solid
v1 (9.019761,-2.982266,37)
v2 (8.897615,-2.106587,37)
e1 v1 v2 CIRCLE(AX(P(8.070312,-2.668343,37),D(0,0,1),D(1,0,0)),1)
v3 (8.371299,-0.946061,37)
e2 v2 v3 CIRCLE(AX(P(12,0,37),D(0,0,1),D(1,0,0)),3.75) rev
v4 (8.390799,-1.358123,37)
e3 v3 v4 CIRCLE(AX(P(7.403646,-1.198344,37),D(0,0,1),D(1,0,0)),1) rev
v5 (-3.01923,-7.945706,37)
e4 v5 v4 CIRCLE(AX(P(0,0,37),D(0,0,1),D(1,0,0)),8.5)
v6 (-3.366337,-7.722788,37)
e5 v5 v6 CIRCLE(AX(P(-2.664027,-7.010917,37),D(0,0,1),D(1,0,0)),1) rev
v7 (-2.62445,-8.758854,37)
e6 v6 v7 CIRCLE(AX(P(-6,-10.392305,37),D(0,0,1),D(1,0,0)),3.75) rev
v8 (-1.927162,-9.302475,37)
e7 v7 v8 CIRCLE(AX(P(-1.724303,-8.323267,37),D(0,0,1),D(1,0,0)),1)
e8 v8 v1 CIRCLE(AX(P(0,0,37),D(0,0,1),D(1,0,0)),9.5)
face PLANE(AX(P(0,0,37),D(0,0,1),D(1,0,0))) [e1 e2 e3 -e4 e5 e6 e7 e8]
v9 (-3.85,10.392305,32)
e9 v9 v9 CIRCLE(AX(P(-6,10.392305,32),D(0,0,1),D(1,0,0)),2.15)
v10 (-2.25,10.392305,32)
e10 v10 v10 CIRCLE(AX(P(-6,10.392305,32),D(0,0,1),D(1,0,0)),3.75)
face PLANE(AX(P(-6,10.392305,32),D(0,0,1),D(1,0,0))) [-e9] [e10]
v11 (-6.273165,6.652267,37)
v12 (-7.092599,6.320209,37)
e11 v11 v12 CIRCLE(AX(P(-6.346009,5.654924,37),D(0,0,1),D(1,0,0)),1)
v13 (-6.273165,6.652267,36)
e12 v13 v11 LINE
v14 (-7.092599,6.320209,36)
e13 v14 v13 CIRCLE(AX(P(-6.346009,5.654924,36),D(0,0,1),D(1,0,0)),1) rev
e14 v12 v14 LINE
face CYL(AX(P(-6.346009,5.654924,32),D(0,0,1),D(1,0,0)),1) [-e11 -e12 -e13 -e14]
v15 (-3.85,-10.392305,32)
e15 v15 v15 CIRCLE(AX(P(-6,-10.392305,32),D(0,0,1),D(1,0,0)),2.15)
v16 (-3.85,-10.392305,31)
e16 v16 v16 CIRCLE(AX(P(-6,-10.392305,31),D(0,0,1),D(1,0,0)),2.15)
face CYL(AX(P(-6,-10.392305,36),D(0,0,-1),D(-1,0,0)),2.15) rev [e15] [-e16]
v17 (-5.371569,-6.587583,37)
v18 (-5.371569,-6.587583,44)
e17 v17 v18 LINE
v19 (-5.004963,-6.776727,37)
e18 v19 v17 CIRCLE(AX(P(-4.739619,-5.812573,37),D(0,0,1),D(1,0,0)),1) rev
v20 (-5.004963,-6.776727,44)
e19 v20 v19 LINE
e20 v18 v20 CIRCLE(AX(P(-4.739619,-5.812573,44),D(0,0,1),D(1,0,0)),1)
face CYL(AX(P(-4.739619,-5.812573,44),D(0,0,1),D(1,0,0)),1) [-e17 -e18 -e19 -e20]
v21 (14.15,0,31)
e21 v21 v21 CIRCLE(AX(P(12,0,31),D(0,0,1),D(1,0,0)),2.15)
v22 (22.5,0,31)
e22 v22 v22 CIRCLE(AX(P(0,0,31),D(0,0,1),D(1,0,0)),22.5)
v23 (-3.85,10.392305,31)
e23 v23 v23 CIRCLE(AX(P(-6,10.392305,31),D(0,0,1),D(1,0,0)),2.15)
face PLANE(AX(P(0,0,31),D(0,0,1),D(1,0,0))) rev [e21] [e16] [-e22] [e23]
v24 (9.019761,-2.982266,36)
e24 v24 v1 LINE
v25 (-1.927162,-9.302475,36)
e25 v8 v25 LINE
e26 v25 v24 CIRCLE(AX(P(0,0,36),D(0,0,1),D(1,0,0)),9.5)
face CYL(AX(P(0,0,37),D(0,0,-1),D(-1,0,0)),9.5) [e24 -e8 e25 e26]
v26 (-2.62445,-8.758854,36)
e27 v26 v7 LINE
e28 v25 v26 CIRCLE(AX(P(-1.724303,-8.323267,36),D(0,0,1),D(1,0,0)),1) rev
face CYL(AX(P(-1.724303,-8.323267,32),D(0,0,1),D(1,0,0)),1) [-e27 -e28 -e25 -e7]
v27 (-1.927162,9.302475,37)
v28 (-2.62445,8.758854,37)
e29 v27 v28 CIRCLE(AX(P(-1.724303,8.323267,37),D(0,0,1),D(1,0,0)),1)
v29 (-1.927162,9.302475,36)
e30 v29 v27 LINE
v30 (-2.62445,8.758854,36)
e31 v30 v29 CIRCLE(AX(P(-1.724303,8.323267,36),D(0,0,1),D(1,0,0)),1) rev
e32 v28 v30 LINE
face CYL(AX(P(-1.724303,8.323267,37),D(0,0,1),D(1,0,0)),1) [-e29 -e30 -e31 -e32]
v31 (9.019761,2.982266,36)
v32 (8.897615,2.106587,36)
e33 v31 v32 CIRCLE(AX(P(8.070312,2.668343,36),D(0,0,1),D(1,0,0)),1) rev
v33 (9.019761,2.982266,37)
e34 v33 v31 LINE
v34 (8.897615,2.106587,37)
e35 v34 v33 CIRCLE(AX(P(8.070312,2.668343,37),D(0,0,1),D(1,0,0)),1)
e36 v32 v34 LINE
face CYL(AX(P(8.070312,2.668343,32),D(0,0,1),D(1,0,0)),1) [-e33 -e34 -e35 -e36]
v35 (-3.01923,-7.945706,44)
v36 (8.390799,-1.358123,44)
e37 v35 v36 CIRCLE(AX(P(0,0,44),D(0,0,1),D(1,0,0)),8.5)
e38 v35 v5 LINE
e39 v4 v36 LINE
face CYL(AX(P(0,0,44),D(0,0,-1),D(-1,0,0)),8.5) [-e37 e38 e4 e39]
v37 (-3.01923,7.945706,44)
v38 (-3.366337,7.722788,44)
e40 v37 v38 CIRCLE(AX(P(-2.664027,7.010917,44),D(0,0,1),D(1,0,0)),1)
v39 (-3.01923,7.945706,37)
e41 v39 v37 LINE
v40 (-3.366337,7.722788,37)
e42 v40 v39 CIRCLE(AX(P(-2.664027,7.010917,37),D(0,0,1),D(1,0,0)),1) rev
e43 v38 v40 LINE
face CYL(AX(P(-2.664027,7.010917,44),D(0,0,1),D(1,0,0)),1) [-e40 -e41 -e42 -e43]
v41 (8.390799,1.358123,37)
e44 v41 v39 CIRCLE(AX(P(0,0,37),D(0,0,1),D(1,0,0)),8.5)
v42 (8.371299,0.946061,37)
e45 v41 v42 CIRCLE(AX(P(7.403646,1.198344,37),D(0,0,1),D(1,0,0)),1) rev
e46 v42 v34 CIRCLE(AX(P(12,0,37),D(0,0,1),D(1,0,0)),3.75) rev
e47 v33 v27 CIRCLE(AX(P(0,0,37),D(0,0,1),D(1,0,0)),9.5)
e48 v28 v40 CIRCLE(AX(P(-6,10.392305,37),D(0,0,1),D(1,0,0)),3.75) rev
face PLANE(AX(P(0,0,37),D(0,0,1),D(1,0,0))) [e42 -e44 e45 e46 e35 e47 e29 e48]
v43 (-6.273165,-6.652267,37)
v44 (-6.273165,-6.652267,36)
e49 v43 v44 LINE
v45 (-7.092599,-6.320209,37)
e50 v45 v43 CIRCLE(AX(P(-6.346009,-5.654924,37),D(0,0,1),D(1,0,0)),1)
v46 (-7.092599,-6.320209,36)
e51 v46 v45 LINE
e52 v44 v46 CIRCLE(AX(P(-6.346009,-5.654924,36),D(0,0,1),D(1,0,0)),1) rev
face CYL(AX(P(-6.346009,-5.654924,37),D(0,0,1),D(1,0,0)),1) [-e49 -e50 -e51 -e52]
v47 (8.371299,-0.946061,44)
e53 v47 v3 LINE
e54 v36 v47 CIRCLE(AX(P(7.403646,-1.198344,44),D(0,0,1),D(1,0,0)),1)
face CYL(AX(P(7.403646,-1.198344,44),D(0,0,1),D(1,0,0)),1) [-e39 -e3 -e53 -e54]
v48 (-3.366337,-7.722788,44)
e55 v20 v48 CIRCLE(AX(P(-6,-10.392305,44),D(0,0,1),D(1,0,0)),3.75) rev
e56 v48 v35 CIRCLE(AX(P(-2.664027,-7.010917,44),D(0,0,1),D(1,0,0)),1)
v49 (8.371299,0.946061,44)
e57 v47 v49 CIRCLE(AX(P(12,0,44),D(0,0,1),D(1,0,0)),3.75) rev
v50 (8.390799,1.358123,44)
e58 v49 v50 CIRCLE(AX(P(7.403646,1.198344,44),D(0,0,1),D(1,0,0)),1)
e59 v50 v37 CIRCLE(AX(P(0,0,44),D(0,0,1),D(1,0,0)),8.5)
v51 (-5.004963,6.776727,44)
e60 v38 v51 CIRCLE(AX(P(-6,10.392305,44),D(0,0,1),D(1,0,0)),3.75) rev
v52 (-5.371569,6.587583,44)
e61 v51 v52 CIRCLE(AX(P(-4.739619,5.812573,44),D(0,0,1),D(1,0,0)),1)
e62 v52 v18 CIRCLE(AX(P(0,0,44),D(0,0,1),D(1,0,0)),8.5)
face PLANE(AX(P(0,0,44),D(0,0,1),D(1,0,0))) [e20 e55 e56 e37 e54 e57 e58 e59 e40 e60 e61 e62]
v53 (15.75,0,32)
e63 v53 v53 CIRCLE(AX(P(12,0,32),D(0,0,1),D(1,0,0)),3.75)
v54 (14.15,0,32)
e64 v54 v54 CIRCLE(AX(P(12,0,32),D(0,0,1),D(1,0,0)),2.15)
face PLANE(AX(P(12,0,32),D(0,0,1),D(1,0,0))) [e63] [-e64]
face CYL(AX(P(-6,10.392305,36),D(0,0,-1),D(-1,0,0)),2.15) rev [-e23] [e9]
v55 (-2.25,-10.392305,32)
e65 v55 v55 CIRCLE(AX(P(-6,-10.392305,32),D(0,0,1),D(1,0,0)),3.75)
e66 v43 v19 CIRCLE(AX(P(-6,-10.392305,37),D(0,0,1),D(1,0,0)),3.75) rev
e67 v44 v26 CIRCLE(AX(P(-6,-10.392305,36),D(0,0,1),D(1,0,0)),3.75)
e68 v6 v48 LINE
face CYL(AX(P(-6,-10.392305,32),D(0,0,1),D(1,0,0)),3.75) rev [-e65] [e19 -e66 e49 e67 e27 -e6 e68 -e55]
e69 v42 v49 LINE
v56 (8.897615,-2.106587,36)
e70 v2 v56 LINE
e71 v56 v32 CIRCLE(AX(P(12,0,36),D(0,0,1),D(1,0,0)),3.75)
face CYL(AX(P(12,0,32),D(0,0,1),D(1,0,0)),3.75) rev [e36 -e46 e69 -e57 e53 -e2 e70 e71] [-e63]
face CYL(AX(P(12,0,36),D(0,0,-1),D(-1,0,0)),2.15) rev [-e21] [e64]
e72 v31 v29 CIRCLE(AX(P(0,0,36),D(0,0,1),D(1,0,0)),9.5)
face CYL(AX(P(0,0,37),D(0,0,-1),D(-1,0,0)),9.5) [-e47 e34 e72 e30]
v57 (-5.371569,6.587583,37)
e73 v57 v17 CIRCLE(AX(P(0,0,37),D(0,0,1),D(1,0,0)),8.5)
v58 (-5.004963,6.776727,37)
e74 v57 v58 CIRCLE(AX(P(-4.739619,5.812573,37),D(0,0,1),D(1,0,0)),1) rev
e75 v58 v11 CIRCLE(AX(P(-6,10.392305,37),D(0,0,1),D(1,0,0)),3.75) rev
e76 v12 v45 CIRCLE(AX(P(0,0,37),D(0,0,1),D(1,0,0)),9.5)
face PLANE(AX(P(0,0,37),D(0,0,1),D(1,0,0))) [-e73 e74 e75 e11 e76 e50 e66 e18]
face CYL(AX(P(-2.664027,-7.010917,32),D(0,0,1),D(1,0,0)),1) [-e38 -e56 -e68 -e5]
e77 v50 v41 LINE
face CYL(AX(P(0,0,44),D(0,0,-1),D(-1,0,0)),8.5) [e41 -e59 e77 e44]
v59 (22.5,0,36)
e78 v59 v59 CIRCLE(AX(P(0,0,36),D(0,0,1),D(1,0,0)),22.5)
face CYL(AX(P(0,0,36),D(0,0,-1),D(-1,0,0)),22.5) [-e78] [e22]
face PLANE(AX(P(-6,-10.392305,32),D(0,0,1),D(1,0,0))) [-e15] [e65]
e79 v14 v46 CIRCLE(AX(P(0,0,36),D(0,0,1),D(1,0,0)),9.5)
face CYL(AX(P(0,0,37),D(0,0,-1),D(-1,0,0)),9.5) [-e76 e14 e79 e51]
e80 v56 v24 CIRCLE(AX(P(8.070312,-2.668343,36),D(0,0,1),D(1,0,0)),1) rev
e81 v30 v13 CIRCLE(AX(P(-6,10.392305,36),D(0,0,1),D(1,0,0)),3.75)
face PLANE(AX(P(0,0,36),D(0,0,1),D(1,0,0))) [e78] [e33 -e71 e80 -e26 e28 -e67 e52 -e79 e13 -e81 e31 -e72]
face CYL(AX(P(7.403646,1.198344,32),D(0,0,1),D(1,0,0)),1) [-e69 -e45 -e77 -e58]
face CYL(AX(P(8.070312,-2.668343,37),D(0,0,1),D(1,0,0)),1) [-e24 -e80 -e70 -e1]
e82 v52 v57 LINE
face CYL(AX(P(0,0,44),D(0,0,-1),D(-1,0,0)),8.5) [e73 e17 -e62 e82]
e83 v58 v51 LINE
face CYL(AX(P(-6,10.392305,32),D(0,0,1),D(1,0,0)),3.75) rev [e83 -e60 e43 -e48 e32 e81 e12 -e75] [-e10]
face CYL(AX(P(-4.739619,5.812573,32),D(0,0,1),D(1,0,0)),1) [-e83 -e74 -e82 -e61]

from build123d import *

# Parameters (mm, degrees)
SKETCH1_R           = 22.5
SKETCH1_R_2         = 2.15
BOSS_EXTRUDE1_DEPTH = 5
SKETCH2_R           = 3.75
CUT_EXTRUDE1_DEPTH  = 4
BOSS_EXTRUDE2_DEPTH = 1
BOSS_EXTRUDE3_DEPTH = 7
FILLET1_R           = 1


# Read off the part's stored shape, not the designer's step: Boss-Extrude2
with BuildPart() as part:
    # Sketch1 → Boss-Extrude1 (new body)
    with BuildSketch(Plane.XY.offset(31)):
        Circle(SKETCH1_R)
        with Locations((-6, 10.392304845)):
            Circle(SKETCH1_R_2, mode=Mode.SUBTRACT)
        with Locations((-6, -10.392304845)):
            Circle(SKETCH1_R_2, mode=Mode.SUBTRACT)
        with Locations((12, 0)):
            Circle(SKETCH1_R_2, mode=Mode.SUBTRACT)
    extrude(amount=BOSS_EXTRUDE1_DEPTH)

    # Sketch2 → Cut-Extrude1 (cut)
    with BuildSketch(Plane.XY.offset(36)):
        with Locations((-6, 10.392304845)):
            Circle(SKETCH2_R)
        with Locations((12, 0)):
            Circle(SKETCH2_R)
        with Locations((-6, -10.392304845)):
            Circle(SKETCH2_R)
    extrude(amount=-CUT_EXTRUDE1_DEPTH, mode=Mode.SUBTRACT)

    # Boss-Extrude2 outline → Boss-Extrude2 (add)
    with BuildSketch(Plane.XY.offset(36)):
        with BuildLine():
            ThreePointArc((9.174479167, -2.46554903), (8.25, 0), (9.174479167, 2.46554903))
            ThreePointArc((9.174479167, 2.46554903), (4.75, 8.227241336), (-2.452011489, 9.17810654))
            ThreePointArc((-2.452011489, 9.17810654), (-4.125, 7.144709581), (-6.722467678, 6.712557509))
            ThreePointArc((-6.722467678, 6.712557509), (-9.5, 0), (-6.722467678, -6.71255751))
            ThreePointArc((-6.722467678, -6.71255751), (-4.125, -7.144709581), (-2.452011489, -9.17810654))
            ThreePointArc((-2.452011489, -9.17810654), (4.75, -8.227241336), (9.174479167, -2.46554903))
        make_face()
    extrude(amount=BOSS_EXTRUDE2_DEPTH)

    # Sketch4 → Boss-Extrude3 (add)
    with BuildSketch(Plane.XY.offset(37)):
        with BuildLine():
            ThreePointArc((8.424479167, -1.130553303), (8.25, 0), (8.424479167, 1.130553303))
            ThreePointArc((8.424479167, 1.130553303), (4.25, 7.361215932), (-3.233151703, 7.861089623))
            ThreePointArc((-3.233151703, 7.861089623), (-4.125, 7.144709581), (-5.191327464, 6.730536321))
            ThreePointArc((-5.191327464, 6.730536321), (-8.5, 0), (-5.191327464, -6.730536321))
            ThreePointArc((-5.191327464, -6.730536321), (-4.125, -7.144709581), (-3.233151703, -7.861089623))
            ThreePointArc((-3.233151703, -7.861089623), (4.25, -7.361215932), (8.424479167, -1.130553303))
        make_face()
    extrude(amount=BOSS_EXTRUDE3_DEPTH)

    # Fillet1
    # the kernel refuses this fillet: 1 mm, written as the material it takes off along each edge
    with BuildSketch(Plane(origin=(9.174479167, -2.46554903, 36), x_dir=(-0.2868427193714439, -0.9579776898986714, 0), z_dir=(0, 0, 1)), Plane(origin=(-2.452011489, 9.17810654, 36), x_dir=(0.9730543753959973, 0.23057576308603095, 0), z_dir=(0, 0, 1)), Plane(origin=(-6.722467678, -6.71255751, 36), x_dir=(-0.6862116560068084, 0.7274019268330224, 0), z_dir=(0, 0, 1))) as fillet1_piece_1:
        with BuildLine():
            CenterArc((0.510994589, -0.999596963), FILLET1_R, 88.373235151, 52.473151254)
            ThreePointArc((-0.264461334, -0.368195259), (-0.126661785, -0.188097556), (0, 0))
            ThreePointArc((0, 0), (0.269691589, 0.003828853), (0.539383177, 0))
        make_face()
    extrude(amount=2.348457943, mode=Mode.SUBTRACT)
    with BuildSketch(Plane(origin=(9.174479167, 2.46554903, 36), x_dir=(-0.28684271937144556, 0.957977689898671, 0), z_dir=(0, 0, 1)), Plane(origin=(-2.452011489, -9.17810654, 36), x_dir=(0.9730543753972882, -0.23057576308058297, 0), z_dir=(0, 0, 1))) as fillet1_piece_2:
        with BuildLine():
            CenterArc((0.510994589, 0.999596963), FILLET1_R, 219.153613594, 52.473151254)
            ThreePointArc((-0.264461334, 0.368195259), (-0.126661785, 0.188097556), (0, 0))
            ThreePointArc((0, 0), (0.269691589, -0.003828853), (0.539383177, 0))
        make_face()
    extrude(amount=2.348457943, mode=Mode.SUBTRACT)
    with BuildSketch(Plane(origin=(-6.722467678, 6.712557509, 36), x_dir=(-0.686211656019457, -0.72740192682109, 0), z_dir=(0, 0, 1))) as fillet1_piece_3:
        with BuildLine():
            CenterArc((0.510994589, 0.999596963), FILLET1_R, 219.153613615, 52.473151233)
            ThreePointArc((-0.264461334, 0.368195259), (-0.126661785, 0.188097556), (0, 0))
            ThreePointArc((0, 0), (0.269691588, -0.003828853), (0.539383177, 0))
        make_face()
    extrude(amount=2.348457942, mode=Mode.SUBTRACT)
    with BuildSketch(Plane(origin=(8.424479167, -1.130553303, 37), x_dir=(-0.27697269239961747, 0.9608777901819289, 0), z_dir=(0, 0, 1)), Plane(origin=(-3.233151703, 7.861089623, 37), x_dir=(-0.6936582300297728, -0.7203042828638206, 0), z_dir=(0, 0, 1)), Plane(origin=(-5.191327464, -6.730536321, 37), x_dir=(0.9706309224297027, -0.24057350731795996, 0), z_dir=(0, 0, 1))) as fillet1_piece_4:
        with BuildLine():
            CenterArc((0.217604369, 0.999672253), FILLET1_R, 244.726311149, 23.806727181)
            ThreePointArc((-0.20933828, 0.095393549), (-0.104991878, 0.046988536), (0, 0))
            ThreePointArc((0, 0), (0.096001927, 0.001229051), (0.192003855, 0))
        make_face()
    extrude(amount=7.57512197, mode=Mode.SUBTRACT)
    with BuildSketch(Plane(origin=(8.424479167, 1.130553303, 37), x_dir=(-0.27697269239961625, -0.9608777901819292, 0), z_dir=(0, 0, 1)), Plane(origin=(-5.191327464, 6.730536321, 37), x_dir=(0.9706309224296972, 0.24057350731798183, 0), z_dir=(0, 0, 1)), Plane(origin=(-3.233151703, -7.861089623, 37), x_dir=(-0.6936582300297843, 0.7203042828638094, 0), z_dir=(0, 0, 1))) as fillet1_piece_5:
        with BuildLine():
            CenterArc((0.217604369, -0.999672253), FILLET1_R, 91.46696167, 23.806727181)
            ThreePointArc((-0.20933828, -0.095393549), (-0.104991878, -0.046988536), (0, 0))
            ThreePointArc((0, 0), (0.096001927, -0.001229051), (0.192003855, 0))
        make_face()
    extrude(amount=7.57512197, mode=Mode.SUBTRACT)


solid = part.part
